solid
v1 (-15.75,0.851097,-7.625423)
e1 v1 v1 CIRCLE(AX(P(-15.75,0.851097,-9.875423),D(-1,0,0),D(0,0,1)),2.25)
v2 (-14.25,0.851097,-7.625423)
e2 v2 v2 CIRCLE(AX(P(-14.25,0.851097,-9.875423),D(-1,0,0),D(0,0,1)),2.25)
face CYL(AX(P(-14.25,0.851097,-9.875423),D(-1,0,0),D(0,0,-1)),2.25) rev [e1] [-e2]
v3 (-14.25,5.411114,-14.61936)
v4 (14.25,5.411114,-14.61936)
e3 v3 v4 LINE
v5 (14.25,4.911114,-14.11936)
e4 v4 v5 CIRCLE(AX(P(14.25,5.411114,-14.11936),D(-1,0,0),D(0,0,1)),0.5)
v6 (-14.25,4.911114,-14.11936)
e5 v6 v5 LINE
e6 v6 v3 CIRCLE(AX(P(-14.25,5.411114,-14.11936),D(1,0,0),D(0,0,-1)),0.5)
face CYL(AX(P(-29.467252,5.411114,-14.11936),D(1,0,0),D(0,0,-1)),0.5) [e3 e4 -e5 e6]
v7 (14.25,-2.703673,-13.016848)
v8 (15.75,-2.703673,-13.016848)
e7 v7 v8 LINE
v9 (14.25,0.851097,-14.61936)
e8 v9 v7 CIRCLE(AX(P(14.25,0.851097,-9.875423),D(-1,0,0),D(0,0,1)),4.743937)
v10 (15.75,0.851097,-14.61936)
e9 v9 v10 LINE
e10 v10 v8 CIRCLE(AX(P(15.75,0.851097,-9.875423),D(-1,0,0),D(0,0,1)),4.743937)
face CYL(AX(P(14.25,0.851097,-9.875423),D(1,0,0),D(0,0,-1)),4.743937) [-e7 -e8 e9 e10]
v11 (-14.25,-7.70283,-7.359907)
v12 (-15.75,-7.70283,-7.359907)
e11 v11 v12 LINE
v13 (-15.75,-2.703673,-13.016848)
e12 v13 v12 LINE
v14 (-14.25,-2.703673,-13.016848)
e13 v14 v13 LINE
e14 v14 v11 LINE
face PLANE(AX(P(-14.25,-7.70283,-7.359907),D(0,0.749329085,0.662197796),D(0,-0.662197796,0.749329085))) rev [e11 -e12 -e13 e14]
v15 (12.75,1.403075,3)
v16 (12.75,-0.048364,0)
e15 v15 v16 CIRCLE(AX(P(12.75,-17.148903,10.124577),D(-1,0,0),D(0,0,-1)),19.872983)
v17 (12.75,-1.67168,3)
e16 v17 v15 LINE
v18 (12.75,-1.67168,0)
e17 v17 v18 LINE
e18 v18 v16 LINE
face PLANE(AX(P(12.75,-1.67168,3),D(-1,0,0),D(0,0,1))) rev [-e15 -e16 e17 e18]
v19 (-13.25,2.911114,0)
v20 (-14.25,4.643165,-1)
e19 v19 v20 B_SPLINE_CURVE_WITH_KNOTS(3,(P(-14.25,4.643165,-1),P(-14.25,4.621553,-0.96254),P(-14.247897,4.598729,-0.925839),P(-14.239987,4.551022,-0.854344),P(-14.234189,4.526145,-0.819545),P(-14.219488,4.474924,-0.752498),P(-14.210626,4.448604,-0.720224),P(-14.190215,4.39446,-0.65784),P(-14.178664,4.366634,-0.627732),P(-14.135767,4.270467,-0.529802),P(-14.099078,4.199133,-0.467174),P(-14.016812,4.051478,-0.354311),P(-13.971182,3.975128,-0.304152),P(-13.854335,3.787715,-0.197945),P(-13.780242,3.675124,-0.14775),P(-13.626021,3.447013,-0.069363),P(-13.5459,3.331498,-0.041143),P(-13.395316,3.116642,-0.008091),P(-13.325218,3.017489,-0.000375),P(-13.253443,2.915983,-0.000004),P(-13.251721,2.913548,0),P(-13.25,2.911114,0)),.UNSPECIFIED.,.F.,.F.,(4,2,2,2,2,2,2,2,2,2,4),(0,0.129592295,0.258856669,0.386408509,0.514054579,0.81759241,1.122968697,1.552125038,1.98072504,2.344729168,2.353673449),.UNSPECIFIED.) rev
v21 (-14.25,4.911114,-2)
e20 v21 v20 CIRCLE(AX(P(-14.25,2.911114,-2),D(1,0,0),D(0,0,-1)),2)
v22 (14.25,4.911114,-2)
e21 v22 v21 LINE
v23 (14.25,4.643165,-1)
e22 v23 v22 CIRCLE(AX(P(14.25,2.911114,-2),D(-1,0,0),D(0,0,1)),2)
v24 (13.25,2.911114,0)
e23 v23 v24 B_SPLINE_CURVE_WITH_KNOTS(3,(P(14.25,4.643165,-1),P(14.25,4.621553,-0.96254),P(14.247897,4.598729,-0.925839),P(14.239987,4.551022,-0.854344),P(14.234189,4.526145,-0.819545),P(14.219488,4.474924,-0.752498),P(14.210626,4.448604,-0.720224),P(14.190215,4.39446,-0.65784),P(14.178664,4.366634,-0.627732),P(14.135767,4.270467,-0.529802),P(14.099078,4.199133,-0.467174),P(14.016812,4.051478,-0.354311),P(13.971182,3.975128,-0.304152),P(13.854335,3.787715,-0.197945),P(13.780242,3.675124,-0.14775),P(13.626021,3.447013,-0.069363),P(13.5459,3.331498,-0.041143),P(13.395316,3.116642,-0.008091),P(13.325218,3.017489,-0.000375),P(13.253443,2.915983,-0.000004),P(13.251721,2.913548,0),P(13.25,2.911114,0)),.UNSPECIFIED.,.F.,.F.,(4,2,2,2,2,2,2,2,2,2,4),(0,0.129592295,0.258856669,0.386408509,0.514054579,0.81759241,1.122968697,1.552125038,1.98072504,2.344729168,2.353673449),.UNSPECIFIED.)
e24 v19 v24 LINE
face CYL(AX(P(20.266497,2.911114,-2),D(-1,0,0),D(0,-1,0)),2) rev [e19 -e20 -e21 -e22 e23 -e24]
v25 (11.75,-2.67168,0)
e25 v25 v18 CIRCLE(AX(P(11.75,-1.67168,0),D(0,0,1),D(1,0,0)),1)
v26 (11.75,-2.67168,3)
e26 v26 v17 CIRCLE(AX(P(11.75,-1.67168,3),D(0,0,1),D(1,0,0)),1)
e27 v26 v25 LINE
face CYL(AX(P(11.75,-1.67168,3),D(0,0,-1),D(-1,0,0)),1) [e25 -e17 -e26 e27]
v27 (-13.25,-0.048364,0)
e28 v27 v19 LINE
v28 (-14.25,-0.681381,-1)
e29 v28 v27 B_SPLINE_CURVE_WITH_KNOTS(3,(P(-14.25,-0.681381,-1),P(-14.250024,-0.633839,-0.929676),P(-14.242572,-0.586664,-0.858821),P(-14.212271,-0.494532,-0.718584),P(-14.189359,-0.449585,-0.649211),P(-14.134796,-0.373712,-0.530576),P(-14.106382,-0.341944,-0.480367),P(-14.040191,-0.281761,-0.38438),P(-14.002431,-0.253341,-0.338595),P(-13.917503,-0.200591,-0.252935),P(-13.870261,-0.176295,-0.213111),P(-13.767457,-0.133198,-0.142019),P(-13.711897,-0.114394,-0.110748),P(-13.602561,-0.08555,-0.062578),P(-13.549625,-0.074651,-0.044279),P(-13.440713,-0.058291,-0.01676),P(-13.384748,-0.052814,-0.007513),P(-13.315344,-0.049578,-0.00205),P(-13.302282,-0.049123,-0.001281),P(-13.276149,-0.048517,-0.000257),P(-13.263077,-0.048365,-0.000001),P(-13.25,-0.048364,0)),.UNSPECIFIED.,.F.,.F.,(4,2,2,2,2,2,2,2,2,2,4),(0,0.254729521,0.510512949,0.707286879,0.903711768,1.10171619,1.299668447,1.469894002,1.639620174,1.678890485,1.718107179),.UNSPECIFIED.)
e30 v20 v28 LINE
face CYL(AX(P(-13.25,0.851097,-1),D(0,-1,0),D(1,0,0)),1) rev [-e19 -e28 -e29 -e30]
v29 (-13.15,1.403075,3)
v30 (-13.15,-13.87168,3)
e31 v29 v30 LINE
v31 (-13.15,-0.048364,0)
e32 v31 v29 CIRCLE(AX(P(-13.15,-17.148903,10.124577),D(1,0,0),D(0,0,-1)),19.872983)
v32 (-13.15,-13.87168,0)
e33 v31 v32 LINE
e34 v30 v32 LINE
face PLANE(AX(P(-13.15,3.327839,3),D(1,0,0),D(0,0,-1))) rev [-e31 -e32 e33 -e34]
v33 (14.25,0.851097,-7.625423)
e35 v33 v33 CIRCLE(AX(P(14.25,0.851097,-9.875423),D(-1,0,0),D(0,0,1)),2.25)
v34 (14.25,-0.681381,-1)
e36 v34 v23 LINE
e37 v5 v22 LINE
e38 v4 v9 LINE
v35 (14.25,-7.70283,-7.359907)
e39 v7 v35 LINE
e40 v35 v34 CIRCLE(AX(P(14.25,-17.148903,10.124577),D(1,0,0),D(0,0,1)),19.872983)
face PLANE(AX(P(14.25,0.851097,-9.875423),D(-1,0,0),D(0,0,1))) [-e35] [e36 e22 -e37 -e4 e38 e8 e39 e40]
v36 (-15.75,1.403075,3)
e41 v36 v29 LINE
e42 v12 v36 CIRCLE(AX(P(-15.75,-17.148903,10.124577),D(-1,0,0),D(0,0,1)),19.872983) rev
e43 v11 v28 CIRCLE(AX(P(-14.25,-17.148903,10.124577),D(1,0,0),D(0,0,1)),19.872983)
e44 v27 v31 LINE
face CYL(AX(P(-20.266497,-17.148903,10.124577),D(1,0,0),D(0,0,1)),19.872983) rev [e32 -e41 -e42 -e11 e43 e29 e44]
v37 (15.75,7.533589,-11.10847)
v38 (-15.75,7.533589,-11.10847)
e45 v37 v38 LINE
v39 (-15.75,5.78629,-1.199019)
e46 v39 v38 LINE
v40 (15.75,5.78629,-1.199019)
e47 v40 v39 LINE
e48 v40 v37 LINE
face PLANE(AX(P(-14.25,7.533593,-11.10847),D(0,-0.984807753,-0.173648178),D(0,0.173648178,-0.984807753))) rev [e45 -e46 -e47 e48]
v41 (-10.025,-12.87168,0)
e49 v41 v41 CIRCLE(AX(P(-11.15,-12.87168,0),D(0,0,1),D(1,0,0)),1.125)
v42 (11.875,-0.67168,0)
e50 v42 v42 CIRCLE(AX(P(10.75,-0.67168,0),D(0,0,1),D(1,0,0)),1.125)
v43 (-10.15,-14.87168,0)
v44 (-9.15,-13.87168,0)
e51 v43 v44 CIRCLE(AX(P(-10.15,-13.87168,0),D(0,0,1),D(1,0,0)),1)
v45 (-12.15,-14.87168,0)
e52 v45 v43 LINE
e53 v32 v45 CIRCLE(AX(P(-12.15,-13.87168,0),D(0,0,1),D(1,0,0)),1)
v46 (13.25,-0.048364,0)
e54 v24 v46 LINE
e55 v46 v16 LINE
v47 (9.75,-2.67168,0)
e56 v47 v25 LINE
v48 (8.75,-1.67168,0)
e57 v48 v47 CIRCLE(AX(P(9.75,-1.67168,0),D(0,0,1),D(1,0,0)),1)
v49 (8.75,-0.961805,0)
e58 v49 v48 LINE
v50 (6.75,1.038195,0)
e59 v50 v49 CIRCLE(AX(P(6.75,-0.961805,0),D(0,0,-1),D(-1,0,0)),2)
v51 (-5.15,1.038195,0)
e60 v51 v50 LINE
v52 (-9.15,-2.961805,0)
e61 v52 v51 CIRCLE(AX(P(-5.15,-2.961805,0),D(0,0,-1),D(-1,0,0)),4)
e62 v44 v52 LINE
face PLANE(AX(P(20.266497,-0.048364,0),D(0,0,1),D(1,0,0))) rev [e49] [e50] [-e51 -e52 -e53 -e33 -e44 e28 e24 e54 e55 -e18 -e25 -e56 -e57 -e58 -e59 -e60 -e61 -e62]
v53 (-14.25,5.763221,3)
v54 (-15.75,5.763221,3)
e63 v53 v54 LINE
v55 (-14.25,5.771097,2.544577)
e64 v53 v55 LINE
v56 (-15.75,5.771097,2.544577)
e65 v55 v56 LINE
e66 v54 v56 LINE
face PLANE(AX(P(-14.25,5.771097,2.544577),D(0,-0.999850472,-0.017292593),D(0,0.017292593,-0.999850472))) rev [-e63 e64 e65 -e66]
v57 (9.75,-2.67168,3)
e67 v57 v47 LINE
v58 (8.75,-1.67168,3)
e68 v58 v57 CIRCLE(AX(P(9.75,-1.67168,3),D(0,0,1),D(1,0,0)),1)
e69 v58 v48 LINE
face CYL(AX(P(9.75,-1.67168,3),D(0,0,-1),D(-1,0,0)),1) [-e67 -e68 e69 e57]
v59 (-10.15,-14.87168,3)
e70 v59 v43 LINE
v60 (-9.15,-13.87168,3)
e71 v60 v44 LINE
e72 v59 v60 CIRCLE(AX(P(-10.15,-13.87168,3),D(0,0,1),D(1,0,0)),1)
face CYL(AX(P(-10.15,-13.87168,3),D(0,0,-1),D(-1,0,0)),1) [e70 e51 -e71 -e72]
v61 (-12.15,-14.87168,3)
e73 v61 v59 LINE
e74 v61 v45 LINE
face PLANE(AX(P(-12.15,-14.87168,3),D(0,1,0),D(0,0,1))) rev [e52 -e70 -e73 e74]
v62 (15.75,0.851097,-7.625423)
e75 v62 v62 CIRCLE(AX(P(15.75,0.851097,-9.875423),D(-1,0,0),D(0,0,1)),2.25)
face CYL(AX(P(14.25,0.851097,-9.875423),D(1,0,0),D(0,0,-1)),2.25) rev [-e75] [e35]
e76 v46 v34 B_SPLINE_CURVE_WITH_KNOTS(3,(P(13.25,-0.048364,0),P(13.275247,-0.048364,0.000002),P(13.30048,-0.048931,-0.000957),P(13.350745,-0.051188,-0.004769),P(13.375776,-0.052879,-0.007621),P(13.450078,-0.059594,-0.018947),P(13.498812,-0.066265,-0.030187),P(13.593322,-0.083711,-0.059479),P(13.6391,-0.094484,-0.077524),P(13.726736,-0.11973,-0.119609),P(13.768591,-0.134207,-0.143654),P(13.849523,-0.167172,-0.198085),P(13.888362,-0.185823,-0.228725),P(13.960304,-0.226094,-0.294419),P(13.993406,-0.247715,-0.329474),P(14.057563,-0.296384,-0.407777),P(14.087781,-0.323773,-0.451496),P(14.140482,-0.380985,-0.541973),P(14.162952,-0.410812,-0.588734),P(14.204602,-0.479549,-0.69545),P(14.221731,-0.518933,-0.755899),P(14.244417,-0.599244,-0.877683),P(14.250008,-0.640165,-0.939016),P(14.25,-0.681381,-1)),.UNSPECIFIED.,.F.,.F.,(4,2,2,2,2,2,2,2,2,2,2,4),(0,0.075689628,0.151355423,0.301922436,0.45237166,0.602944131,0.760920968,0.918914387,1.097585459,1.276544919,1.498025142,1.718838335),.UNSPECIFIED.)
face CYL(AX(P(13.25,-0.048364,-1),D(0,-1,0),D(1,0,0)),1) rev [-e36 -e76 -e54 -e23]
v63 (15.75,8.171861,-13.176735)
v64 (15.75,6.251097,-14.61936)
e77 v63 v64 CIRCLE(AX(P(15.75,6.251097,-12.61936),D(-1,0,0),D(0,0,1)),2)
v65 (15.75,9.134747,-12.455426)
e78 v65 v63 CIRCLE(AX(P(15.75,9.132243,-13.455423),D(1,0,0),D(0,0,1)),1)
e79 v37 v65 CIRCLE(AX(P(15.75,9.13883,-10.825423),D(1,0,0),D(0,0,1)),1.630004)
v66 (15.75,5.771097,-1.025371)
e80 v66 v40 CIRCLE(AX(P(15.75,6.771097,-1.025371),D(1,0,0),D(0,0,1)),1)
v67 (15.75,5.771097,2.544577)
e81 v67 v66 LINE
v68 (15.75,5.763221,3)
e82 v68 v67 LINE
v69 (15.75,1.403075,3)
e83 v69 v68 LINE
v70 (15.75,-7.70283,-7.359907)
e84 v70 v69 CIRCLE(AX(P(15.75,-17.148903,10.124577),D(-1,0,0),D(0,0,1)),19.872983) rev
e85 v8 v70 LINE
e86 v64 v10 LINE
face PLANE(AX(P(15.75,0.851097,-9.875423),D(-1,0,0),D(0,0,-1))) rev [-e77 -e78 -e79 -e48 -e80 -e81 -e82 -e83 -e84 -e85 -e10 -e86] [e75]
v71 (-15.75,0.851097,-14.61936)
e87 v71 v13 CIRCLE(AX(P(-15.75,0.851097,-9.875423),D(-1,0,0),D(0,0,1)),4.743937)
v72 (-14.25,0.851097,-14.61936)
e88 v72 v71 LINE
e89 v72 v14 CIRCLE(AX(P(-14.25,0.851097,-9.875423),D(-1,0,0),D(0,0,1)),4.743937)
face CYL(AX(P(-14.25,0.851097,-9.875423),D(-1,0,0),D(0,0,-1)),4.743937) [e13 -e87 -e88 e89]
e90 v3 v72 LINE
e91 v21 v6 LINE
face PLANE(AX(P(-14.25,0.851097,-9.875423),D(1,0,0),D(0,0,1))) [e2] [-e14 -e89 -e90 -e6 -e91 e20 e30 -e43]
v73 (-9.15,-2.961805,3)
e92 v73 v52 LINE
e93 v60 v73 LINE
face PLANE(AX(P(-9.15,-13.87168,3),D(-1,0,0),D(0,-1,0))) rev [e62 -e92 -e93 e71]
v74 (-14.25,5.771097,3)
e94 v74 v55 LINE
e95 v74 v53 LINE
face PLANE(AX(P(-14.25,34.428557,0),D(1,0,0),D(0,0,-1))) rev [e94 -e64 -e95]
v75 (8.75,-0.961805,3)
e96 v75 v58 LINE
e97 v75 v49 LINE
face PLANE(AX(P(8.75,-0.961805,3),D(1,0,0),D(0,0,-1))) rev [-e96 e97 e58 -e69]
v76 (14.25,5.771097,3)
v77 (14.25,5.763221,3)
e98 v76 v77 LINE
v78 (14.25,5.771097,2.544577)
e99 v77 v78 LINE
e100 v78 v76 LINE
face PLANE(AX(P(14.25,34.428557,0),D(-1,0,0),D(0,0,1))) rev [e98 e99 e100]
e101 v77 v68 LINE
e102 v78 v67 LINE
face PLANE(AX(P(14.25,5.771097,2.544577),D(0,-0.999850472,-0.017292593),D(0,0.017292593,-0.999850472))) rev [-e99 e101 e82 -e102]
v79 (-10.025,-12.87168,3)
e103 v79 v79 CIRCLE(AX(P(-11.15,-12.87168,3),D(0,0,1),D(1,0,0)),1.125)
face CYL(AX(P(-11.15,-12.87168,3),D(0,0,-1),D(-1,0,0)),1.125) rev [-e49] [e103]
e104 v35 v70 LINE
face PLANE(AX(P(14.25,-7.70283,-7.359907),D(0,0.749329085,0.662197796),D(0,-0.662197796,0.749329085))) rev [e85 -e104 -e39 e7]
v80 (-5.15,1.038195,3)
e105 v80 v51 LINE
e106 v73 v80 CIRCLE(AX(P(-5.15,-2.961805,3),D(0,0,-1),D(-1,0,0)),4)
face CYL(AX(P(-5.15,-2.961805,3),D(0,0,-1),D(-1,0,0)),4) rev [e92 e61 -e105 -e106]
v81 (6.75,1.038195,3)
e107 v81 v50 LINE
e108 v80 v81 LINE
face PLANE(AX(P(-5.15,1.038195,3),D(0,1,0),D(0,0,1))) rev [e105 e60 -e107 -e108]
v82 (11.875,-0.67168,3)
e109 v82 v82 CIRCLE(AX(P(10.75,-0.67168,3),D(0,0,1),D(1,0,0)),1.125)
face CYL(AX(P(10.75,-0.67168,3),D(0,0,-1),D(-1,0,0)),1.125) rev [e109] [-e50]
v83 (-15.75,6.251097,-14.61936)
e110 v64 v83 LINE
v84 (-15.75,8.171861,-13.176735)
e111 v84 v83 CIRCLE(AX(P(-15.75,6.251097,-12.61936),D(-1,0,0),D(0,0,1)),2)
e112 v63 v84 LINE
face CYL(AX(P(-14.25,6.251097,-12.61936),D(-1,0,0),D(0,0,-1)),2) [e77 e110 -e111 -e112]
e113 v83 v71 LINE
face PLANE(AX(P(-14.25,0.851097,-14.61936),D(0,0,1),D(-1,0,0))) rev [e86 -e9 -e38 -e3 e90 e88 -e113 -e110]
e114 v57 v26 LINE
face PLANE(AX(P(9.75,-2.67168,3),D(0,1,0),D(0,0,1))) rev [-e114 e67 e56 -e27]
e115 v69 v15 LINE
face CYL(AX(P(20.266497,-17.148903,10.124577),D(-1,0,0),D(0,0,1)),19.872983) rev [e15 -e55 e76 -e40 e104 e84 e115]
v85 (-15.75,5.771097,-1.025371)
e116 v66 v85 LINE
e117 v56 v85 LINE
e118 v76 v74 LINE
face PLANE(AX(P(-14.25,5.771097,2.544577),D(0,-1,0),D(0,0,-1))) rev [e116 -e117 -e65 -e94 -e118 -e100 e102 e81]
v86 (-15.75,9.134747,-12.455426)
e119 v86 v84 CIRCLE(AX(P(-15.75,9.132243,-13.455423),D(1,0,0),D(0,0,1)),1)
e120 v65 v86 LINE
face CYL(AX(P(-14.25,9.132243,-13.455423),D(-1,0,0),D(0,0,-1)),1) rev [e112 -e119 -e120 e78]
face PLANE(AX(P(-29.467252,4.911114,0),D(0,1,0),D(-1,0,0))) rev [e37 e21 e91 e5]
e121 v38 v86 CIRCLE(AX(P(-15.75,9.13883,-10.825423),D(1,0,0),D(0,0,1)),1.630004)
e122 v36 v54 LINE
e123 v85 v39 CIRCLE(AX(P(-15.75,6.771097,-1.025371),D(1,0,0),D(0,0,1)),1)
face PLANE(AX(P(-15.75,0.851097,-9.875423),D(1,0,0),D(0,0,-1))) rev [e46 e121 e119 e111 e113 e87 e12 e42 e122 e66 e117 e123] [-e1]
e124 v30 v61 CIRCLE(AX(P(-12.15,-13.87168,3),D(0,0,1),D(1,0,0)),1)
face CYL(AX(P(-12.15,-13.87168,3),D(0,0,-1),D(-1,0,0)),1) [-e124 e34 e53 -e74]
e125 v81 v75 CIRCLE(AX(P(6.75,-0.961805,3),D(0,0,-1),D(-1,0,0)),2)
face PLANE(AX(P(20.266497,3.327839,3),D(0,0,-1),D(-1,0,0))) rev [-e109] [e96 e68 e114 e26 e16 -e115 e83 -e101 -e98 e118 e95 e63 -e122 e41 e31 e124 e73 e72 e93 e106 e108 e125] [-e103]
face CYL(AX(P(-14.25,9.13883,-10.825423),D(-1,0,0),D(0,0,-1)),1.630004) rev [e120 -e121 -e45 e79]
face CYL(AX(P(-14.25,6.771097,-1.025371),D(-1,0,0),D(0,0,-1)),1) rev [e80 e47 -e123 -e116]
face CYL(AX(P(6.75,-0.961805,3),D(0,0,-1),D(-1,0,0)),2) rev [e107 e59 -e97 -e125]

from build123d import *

# Parameters (mm, degrees)
SKETCH1_R            = 1.125
BOSS_EXTRUDE1_DEPTH  = 3
BOSS_EXTRUDE2_DEPTH  = 3
SKETCH4_R            = 2.25
BOSS_EXTRUDE4_DEPTH  = 1.5
BOSS_EXTRUDE5_START  = 28.5
BOSS_EXTRUDE5_DEPTH  = 28.5
SKETCH8_W            = 28.5
SKETCH8_H            = 3
BOSS_EXTRUDE13_DEPTH = 2.443258406
FILLET1_R            = 2
FILLET2_R            = 1


with BuildPart() as part:
    # Sketch1 → Boss-Extrude1 (new body)
    with BuildSketch(Plane.XY):
        with BuildLine():
            Line((-13.15, 3.327838927), (-13.15, -13.87167957))
            ThreePointArc((-13.15, -13.87167957), (-12.857106781, -14.578786352), (-12.15, -14.87167957))
            Line((-12.15, -14.87167957), (-10.15, -14.87167957))
            ThreePointArc((-10.15, -14.87167957), (-9.442893219, -14.578786352), (-9.15, -13.87167957))
            Line((-9.15, -13.87167957), (-9.15, -2.961805456))
            ThreePointArc((-9.15, -2.961805456), (-7.978427125, -0.133378332), (-5.15, 1.038194544))
            Line((-5.15, 1.038194544), (6.75, 1.038194544))
            ThreePointArc((6.75, 1.038194544), (8.164213562, 0.452408106), (8.75, -0.961805456))
            Line((8.75, -0.961805456), (8.75, -1.67167957))
            ThreePointArc((8.75, -1.67167957), (9.042893219, -2.378786352), (9.75, -2.67167957))
            Line((9.75, -2.67167957), (11.75, -2.67167957))
            ThreePointArc((11.75, -2.67167957), (12.457106781, -2.378786352), (12.75, -1.67167957))
            Line((12.75, -1.67167957), (12.75, 3.327838927))
            Line((12.75, 3.327838927), (-13.15, 3.327838927))
        make_face()
        with Locations((-11.15, -12.87167957)):
            Circle(SKETCH1_R, mode=Mode.SUBTRACT)
        with Locations((10.75, -0.67167957)):
            Circle(SKETCH1_R, mode=Mode.SUBTRACT)
    extrude(amount=BOSS_EXTRUDE1_DEPTH)


with BuildPart() as body_2:
    # Sketch2 → Boss-Extrude2 (new body)
    with BuildSketch(Plane(origin=(12.75, 0, 0), x_dir=(0, 0, -1), z_dir=(1, 0, 0))):
        with BuildLine():
            Line((0, -0.048364378), (0, 3.327838927))
            Line((0, 3.327838927), (-3, 3.327838927))
            Line((-3, 3.327838927), (-3, 1.403074886))
            ThreePointArc((-3, 1.403074886), (-1.469520823, 0.740353088), (0, -0.048364378))
        make_face()
    boss_extrude2 = extrude(amount=BOSS_EXTRUDE2_DEPTH)


with BuildPart() as body_3:
    # Sketch4 → Boss-Extrude4 (new body)
    with BuildSketch(Plane.ZY.offset(-15.75)):
        with BuildLine():
            Line((-14.619360276, 0.851097333), (-14.619360276, 6.251097333))
            ThreePointArc((-14.619360276, 6.251097333), (-14.218539822, 7.452190493), (-13.176735496, 8.171860948))
            ThreePointArc((-13.176735496, 8.171860948), (-12.655081911, 8.532697951), (-12.455426242, 9.134747301))
            ThreePointArc((-12.455426242, 9.134747301), (-12.072768819, 8.089517784), (-11.108469635, 7.533593094))
            Line((-11.108469635, 7.533593094), (-1.19901898, 5.78628958))
            ThreePointArc((-1.19901898, 5.78628958), (-1.112526545, 5.774902634), (-1.025370803, 5.771097333))
            Line((-1.025370803, 5.771097333), (2.544576896, 5.771097333))
            Line((2.544576896, 5.771097333), (3, 5.763220708))
            Line((3, 5.763220708), (3, 1.403074886))
            ThreePointArc((3, 1.403074886), (-2.995287542, -2.222261242), (-7.359906948, -7.702829842))
            Line((-7.359906948, -7.702829842), (-13.016847846, -2.703672769))
            ThreePointArc((-13.016847846, -2.703672769), (-14.200215671, -1.098546004), (-14.619360276, 0.851097333))
        make_face()
        with Locations((-9.875423105, 0.851097333)):
            Circle(SKETCH4_R, mode=Mode.SUBTRACT)
    boss_extrude4 = extrude(amount=BOSS_EXTRUDE4_DEPTH)

    # Sketch5 → Boss-Extrude5 (add)
    with BuildSketch(Plane.ZY.offset(-14.25).offset(BOSS_EXTRUDE5_START)):
        with BuildLine():
            Line((0, 4.911114143), (0, 5.771097333))
            Line((0, 5.771097333), (-1.025370803, 5.771097333))
            ThreePointArc((-1.025370803, 5.771097333), (-1.112526545, 5.774902634), (-1.19901898, 5.78628958))
            Line((-1.19901898, 5.78628958), (-11.108470351, 7.533589032))
            ThreePointArc((-11.108470351, 7.533589032), (-12.072769301, 8.089518357), (-12.455426242, 9.134747301))
            ThreePointArc((-12.455426242, 9.134747301), (-12.655081911, 8.532697951), (-13.176735496, 8.171860948))
            ThreePointArc((-13.176735496, 8.171860948), (-14.218539822, 7.452190493), (-14.619360276, 6.251097333))
            Line((-14.619360276, 6.251097333), (-14.619360276, 5.411114143))
            ThreePointArc((-14.619360276, 5.411114143), (-14.472913667, 5.057560752), (-14.119360276, 4.911114143))
            Line((-14.119360276, 4.911114143), (0, 4.911114143))
        make_face()
    extrude(amount=-BOSS_EXTRUDE5_DEPTH)


with BuildPart() as part_1:
    add(part.part)

    # Mirror4: Boss-Extrude2, Boss-Extrude4 across plane
    add(boss_extrude2.mirror(Plane(origin=(0, 0, 0), x_dir=(0, 0, 1), z_dir=(1, 0, 0))))
    add(boss_extrude4.mirror(Plane(origin=(0, 0, 0), x_dir=(0, 0, 1), z_dir=(1, 0, 0))))

    add(body_2.part)  # Boss-Extrude13 merges body 2

    add(body_3.part)  # Boss-Extrude13 merges body 3
    # Sketch8 → Boss-Extrude13 (add)
    with BuildSketch(Plane(origin=(0, 3.327838927, 0), x_dir=(1, 0, 0), z_dir=(0, 1, 0))):
        with Locations((0, -1.5)):
            Rectangle(SKETCH8_W, SKETCH8_H)
    extrude(amount=BOSS_EXTRUDE13_DEPTH)

    # Fillet1
    fillet1_edges = [part_1.edges().sort_by_distance(p)[0] for p in [
        (0, 4.911114143, 0),
    ]]
    fillet(fillet1_edges, radius=FILLET1_R)

    # Fillet2
    # the kernel refuses this fillet: 1 mm, written as the material it adds along each edge
    with BuildSketch(Plane(origin=(14.25, -2.548364378, 0), x_dir=(0, 0, -1), z_dir=(0, 1, 0))) as fillet2_piece_1_section:
        with BuildLine():
            CenterArc((FILLET2_R, FILLET2_R), FILLET2_R, 180, 90)
            Line((0, FILLET2_R), (0, 0))
            Line((0, 0), (FILLET2_R, 0))
        make_face()
    fillet2_piece_1 = extrude(amount=7.959478521, mode=Mode.PRIVATE)
    fillet2_piece_1 = fillet2_piece_1 - Plane(origin=(13.964239779, -17.148902667, 10.124576895), x_dir=(0, 0.9335275549954881, -0.35850565415924185), z_dir=(1, 0, 0)) * Cylinder(19.872983346, 20, mode=Mode.PRIVATE)
    add(fillet2_piece_1)
    with BuildSketch(Plane(origin=(-14.25, -2.548364378, 0), x_dir=(1, 0, 0), z_dir=(0, 1, 0))) as fillet2_piece_2_section:
        with BuildLine():
            CenterArc((FILLET2_R, FILLET2_R), FILLET2_R, 180, 90)
            Line((0, FILLET2_R), (0, 0))
            Line((0, 0), (FILLET2_R, 0))
        make_face()
    fillet2_piece_2 = extrude(amount=7.959478521, mode=Mode.PRIVATE)
    fillet2_piece_2 = fillet2_piece_2 - Plane(origin=(-13.964240251, -17.148902667, 10.124576895), x_dir=(0, 0.9335275549956203, -0.3585056541588977), z_dir=(1, 0, 0)) * Cylinder(19.872983346, 20, mode=Mode.PRIVATE)
    add(fillet2_piece_2)


solid = part_1.part
